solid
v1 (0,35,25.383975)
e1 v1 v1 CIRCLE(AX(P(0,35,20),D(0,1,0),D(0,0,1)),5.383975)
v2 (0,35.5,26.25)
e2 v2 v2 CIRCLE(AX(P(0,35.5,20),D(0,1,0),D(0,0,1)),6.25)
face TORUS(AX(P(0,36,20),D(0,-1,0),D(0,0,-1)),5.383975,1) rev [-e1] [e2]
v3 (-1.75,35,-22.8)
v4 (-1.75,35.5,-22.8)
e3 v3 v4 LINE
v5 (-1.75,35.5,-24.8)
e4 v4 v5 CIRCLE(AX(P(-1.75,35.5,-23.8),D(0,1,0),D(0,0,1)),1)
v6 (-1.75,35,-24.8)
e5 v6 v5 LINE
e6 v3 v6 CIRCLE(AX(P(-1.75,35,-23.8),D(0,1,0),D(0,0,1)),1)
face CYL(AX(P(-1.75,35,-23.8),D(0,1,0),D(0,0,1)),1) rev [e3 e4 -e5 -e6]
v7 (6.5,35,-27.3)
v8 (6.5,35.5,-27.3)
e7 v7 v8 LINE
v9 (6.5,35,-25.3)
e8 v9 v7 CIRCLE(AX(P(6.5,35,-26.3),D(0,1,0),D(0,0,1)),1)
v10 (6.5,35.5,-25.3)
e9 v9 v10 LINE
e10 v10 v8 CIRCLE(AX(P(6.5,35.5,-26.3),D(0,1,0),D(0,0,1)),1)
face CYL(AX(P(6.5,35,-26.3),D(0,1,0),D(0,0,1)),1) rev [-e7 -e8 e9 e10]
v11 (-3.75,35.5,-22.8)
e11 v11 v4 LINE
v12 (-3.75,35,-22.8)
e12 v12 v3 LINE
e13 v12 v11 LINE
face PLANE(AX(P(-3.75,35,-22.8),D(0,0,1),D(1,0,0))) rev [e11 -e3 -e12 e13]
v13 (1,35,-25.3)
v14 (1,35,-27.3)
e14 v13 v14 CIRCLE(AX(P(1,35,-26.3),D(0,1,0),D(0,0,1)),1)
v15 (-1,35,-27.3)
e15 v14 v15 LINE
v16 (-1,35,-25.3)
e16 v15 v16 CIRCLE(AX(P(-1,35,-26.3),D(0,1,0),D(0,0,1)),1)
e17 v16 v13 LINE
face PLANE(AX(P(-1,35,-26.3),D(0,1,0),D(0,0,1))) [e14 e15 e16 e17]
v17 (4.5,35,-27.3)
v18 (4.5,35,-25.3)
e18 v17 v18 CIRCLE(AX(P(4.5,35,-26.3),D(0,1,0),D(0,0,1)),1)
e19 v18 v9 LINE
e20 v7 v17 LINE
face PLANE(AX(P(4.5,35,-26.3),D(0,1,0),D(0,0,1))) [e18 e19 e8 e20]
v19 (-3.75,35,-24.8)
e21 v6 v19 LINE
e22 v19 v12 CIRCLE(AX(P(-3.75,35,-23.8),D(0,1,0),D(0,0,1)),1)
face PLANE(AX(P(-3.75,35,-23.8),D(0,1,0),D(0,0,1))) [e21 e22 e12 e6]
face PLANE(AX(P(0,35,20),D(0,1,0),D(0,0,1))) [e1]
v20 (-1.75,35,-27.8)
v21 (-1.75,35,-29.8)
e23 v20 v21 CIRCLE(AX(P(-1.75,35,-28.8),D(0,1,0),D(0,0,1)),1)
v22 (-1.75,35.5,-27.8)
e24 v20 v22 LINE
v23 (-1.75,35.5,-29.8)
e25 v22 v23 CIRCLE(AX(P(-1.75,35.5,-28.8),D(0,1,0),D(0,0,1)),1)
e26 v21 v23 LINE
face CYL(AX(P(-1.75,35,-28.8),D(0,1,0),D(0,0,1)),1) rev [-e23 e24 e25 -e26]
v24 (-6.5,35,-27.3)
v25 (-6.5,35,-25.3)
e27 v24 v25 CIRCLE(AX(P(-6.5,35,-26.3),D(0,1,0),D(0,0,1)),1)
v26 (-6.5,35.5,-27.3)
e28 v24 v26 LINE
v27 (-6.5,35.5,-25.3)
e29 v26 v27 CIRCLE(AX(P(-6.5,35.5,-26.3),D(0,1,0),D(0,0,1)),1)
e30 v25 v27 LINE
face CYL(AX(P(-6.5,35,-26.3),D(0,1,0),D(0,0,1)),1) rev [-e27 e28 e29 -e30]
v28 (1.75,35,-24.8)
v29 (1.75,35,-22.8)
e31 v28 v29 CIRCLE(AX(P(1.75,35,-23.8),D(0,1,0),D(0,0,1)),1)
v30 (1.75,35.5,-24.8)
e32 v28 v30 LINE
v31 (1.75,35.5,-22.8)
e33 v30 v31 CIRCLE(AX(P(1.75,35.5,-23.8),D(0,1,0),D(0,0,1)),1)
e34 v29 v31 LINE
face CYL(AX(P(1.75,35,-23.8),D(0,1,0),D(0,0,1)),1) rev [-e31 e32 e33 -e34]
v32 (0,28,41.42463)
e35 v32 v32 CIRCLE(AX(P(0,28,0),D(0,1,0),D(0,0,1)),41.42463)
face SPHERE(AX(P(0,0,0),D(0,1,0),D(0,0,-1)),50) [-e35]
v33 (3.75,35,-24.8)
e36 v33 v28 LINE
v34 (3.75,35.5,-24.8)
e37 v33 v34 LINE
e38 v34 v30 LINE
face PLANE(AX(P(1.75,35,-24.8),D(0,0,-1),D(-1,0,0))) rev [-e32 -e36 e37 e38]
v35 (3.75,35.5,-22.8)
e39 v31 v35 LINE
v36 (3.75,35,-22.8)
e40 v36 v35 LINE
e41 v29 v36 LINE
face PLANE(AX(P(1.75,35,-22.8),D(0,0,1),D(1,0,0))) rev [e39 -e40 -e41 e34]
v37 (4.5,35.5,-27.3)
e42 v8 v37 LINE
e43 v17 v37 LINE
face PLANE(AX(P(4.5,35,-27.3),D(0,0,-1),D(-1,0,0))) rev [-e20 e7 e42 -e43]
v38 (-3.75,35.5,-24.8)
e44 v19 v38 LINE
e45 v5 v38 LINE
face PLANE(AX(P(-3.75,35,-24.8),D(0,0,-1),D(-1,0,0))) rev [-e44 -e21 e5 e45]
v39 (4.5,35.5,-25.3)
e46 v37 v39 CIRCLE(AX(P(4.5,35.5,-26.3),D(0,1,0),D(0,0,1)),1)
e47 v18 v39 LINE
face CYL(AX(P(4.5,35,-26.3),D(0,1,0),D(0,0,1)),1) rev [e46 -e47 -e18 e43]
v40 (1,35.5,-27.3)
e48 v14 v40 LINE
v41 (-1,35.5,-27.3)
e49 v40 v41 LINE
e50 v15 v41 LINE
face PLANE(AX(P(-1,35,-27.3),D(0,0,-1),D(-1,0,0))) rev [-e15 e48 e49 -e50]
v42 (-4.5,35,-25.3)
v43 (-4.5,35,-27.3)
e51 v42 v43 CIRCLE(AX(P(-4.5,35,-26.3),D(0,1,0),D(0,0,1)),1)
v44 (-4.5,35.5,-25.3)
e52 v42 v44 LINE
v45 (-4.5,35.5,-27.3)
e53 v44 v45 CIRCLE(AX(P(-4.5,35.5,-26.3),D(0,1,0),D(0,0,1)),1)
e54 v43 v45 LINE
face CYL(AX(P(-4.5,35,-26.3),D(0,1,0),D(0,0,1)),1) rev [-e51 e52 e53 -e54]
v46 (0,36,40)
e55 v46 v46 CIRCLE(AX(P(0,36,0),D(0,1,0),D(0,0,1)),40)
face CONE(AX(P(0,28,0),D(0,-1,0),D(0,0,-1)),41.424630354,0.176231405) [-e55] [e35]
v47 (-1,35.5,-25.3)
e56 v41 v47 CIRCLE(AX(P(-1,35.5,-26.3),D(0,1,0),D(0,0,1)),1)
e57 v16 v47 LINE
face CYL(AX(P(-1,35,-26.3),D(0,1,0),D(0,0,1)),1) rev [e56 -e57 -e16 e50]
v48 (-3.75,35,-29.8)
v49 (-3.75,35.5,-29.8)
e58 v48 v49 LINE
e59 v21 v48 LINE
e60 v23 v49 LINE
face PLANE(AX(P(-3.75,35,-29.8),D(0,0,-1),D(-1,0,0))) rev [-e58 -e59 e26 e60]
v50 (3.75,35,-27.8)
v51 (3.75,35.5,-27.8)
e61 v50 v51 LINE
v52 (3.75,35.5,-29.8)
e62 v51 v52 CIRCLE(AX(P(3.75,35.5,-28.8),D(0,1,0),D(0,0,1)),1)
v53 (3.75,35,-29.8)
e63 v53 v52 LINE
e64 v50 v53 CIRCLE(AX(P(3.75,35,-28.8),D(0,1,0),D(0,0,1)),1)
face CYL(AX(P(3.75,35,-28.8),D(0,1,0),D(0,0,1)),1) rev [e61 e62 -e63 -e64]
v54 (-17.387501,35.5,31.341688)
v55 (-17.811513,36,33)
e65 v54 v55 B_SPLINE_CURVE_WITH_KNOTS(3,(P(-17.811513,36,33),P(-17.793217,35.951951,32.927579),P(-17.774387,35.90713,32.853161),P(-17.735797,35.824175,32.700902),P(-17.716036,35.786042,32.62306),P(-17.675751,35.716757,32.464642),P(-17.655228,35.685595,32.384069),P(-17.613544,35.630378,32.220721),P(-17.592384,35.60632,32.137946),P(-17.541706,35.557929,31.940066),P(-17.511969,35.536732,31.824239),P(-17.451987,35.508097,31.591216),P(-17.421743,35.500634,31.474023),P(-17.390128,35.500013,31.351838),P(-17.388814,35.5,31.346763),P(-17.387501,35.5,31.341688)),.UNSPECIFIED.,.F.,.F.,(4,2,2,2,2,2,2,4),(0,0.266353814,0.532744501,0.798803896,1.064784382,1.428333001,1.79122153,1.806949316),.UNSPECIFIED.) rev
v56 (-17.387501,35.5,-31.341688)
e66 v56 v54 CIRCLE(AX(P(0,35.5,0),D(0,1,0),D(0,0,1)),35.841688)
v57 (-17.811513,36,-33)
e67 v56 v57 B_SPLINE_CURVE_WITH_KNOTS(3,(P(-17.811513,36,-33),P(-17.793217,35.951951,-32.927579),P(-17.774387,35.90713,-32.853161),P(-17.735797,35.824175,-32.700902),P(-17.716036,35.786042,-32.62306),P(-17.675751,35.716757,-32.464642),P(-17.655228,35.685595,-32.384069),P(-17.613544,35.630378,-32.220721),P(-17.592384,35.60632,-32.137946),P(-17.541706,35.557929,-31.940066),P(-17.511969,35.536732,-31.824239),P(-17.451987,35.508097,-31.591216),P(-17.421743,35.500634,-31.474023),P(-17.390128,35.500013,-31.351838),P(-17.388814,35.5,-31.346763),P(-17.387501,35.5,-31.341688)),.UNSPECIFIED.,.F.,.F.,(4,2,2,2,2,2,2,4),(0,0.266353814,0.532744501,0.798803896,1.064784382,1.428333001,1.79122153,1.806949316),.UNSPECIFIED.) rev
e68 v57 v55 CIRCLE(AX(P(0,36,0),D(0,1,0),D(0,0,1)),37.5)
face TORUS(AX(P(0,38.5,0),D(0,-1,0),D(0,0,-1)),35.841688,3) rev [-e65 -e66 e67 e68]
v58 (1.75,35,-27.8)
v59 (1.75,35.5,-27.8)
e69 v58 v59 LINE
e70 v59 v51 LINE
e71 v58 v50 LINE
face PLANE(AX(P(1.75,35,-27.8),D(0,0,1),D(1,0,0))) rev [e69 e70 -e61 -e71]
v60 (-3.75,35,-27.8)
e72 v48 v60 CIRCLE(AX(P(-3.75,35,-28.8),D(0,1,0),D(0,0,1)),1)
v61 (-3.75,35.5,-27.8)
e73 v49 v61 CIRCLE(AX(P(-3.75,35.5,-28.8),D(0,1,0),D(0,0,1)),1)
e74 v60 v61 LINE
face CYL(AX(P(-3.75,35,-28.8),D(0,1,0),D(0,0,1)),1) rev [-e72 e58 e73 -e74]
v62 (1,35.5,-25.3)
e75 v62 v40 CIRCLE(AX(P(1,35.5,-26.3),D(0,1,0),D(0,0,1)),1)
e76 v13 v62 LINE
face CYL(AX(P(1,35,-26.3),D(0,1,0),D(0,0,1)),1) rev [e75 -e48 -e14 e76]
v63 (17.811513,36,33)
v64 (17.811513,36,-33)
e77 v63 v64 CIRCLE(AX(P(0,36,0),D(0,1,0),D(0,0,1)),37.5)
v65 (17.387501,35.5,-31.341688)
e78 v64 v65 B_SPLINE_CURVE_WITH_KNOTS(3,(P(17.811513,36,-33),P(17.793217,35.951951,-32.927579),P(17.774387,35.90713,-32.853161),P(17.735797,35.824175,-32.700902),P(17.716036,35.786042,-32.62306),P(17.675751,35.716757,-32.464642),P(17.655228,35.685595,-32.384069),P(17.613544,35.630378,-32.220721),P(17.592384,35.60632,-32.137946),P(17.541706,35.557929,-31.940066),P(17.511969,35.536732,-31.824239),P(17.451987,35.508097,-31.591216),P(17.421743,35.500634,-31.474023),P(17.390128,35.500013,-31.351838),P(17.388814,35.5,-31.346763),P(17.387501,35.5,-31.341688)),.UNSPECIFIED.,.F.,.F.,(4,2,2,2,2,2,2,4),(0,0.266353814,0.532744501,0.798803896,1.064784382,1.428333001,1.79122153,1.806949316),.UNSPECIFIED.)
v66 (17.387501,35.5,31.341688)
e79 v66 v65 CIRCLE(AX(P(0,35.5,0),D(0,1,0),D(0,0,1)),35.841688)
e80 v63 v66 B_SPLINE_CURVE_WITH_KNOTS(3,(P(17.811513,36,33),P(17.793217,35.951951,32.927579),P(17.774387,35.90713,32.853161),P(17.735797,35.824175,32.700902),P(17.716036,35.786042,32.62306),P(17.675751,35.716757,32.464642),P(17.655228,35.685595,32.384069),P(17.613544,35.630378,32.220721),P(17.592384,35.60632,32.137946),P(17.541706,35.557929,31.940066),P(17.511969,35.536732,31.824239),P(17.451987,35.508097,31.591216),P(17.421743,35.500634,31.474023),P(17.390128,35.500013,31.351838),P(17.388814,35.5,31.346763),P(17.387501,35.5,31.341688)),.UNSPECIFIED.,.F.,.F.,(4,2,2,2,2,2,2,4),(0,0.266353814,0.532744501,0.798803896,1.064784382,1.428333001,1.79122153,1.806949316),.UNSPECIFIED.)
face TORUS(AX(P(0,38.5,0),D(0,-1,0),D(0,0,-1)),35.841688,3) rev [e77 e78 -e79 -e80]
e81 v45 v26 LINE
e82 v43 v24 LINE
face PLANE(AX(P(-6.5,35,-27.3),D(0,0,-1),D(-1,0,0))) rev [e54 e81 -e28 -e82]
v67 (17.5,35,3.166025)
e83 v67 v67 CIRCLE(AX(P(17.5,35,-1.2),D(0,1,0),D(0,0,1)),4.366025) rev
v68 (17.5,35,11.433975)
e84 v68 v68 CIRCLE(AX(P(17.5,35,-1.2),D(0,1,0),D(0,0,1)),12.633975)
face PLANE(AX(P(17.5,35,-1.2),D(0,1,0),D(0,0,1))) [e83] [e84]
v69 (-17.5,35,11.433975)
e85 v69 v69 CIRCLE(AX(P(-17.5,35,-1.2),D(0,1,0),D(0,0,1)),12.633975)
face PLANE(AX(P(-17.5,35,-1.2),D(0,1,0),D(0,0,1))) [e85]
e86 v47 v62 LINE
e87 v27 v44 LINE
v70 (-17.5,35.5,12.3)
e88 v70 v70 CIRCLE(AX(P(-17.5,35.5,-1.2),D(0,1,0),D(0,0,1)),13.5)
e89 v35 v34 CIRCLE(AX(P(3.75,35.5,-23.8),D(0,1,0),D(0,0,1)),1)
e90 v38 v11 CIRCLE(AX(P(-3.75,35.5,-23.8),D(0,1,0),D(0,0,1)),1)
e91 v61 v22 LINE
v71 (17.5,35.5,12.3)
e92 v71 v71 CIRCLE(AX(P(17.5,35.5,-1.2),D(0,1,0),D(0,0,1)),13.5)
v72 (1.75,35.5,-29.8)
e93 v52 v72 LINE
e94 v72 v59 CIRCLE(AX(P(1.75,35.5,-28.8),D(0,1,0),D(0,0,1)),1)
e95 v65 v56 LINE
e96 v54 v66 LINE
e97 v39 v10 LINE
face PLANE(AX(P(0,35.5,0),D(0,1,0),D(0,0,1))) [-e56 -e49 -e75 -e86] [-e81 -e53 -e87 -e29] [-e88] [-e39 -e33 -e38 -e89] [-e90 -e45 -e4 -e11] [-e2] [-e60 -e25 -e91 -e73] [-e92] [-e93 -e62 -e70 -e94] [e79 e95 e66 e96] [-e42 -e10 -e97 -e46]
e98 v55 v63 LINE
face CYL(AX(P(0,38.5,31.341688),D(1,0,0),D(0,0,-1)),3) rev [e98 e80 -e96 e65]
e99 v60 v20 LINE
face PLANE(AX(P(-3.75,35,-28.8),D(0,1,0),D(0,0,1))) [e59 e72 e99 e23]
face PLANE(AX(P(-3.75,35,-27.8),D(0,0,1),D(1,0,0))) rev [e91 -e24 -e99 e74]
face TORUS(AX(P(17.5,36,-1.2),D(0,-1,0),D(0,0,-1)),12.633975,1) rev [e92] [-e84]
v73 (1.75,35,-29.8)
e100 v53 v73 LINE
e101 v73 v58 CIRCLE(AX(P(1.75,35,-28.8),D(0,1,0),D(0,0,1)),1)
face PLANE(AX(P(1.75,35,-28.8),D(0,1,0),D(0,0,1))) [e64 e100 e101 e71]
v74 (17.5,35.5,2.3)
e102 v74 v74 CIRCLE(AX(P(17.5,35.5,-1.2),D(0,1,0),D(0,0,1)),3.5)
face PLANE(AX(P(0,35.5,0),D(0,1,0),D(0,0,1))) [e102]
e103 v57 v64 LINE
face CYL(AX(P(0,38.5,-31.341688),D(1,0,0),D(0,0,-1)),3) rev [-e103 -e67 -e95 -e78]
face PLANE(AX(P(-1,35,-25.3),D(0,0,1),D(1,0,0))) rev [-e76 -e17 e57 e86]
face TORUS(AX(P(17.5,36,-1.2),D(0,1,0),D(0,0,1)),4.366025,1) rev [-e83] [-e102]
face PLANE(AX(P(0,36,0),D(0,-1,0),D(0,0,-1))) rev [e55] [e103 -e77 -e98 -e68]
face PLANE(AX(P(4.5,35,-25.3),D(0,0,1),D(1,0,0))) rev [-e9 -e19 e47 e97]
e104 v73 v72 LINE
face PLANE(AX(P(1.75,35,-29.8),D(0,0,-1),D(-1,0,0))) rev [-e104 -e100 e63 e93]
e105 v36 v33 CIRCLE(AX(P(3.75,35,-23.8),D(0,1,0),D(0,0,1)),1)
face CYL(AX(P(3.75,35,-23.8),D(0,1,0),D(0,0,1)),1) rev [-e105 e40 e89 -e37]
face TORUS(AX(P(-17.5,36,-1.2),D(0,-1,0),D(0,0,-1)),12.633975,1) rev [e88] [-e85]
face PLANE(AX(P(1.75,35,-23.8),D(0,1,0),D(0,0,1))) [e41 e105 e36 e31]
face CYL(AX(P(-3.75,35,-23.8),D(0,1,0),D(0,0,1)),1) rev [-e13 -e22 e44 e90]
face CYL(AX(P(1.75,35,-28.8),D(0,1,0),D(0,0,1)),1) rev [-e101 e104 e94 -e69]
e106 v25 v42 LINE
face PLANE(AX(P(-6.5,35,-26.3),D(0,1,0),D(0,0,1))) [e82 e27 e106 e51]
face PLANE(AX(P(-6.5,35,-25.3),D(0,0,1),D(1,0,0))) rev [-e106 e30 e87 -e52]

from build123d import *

# Parameters (mm, degrees)
EXTRUDE1_DEPTH = 0.5
FILLET1_R      = 3
SKETCH3_R      = 13.5
SKETCH3_R_2    = 3.5
SKETCH3_R_3    = 6.25
EXTRUDE2_DEPTH = 0.5
FILLET2_R      = 1


with BuildPart() as part:
    # Sketch1 → Revolve1 (revolve)
    with BuildSketch(Plane(origin=(0, 0, 0), x_dir=(0, 0, -1), z_dir=(1, 0, 0))):
        with BuildLine():
            Line((40, 36), (41.424630354, 28))
            ThreePointArc((41.424630354, 28), (44.158804332, -23.452078799), (0, -50))
            Line((0, -50), (0, 36))
            Line((0, 36), (40, 36))
        make_face()
    revolve(axis=Axis((0, 36, 0), (0, -1, 0)))

    # Sketch2 → Extrude1 (cut)
    with BuildSketch(Plane(origin=(0, 36, 0), x_dir=(1, 0, 0), z_dir=(0, 1, 0))):
        with BuildLine():
            Line((17.811513131, 33), (-17.811513131, 33))
            ThreePointArc((-17.811513131, 33), (-37.5, 0), (-17.811513131, -33))
            Line((-17.811513131, -33), (17.811513131, -33))
            ThreePointArc((17.811513131, -33), (32.20389528, -19.213514223), (37.5, 0))
            ThreePointArc((37.5, 0), (32.20389528, 19.213514223), (17.811513131, 33))
        make_face()
    extrude(amount=-EXTRUDE1_DEPTH, mode=Mode.SUBTRACT)

    # Fillet1
    # the kernel refuses this fillet: 3 mm, written as the material it adds along each edge
    with BuildSketch(Plane(origin=(-21.957294119, 35.5, 33), x_dir=(0, 1.0, -3.3253400033406348e-12), z_dir=(1, 0, 0)), Plane(origin=(21.957294119, 35.5, -33), x_dir=(0, 1.0, 3.3253400033406348e-12), z_dir=(-1, 0, 0))) as fillet1_piece_1:
        with BuildLine():
            CenterArc((3, -1.658312395), FILLET1_R, 146.442690238, 33.557309762)
            Line((0, -1.658312395), (0, 0))
            Line((0, 0), (0.5, 0))
        make_face()
    extrude(amount=43.914588237)
    with BuildSketch(Plane(origin=(0, 35.5, 0), x_dir=(0.37490714563861727, 0, 0.9270623669144945), z_dir=(-0.9270623669144945, 0, 0.37490714563861727))) as fillet1_piece_2:
        with BuildLine():
            CenterArc((35.841687605, 3), FILLET1_R, 270, 33.557309762)
            Line((35.841687605, 0), (37.5, 0))
            Line((37.5, 0), (37.5, 0.5))
        make_face()
    revolve(axis=Axis((0, 35.5, 0), (0, 1, 0)), revolution_arc=135.962852024)
    with BuildSketch(Plane(origin=(0, 35.5, 0), x_dir=(-0.37490714563861693, 0, -0.9270623669144946), z_dir=(0.9270623669144946, 0, -0.37490714563861693))) as fillet1_piece_3:
        with BuildLine():
            CenterArc((35.841687605, 3), FILLET1_R, 270, 33.557309762)
            Line((35.841687605, 0), (37.5, 0))
            Line((37.5, 0), (37.5, 0.5))
        make_face()
    revolve(axis=Axis((0, 35.5, 0), (0, 1, 0)), revolution_arc=135.962852024)

    # Sketch3 → Extrude2 (cut)
    # profile 1 of 10: a face of its own
    with BuildSketch(Plane(origin=(0, 35.5, 0), x_dir=(1, 0, 0), z_dir=(0, 1, 0))):
        with Locations(Location((-17.5, 1.2, 0), (0, 0, 270))):
            Circle(SKETCH3_R)
    # profile 2 of 10: a face of its own
    with BuildSketch(Plane(origin=(0, 35.5, 0), x_dir=(1, 0, 0), z_dir=(0, 1, 0))):
        with Locations(Location((17.5, 1.2, 0), (0, 0, 270))):
            Circle(SKETCH3_R)
        with Locations(Location((17.5, 1.2, 0), (0, 0, 270))):
            Circle(SKETCH3_R_2, mode=Mode.SUBTRACT)
    # profile 3 of 10: a face of its own
    with BuildSketch(Plane(origin=(0, 35.5, 0), x_dir=(1, 0, 0), z_dir=(0, 1, 0))):
        with Locations(Location((0, -20, 0), (0, 0, 270))):
            Circle(SKETCH3_R_3)
    # profile 4 of 10: a face of its own
    with BuildSketch(Plane(origin=(0, 35.5, 0), x_dir=(1, 0, 0), z_dir=(0, 1, 0))):
        with BuildLine():
            Line((-3.75, 24.8), (-1.75, 24.8))
            ThreePointArc((-1.75, 24.8), (-0.75, 23.8), (-1.75, 22.8))
            Line((-1.75, 22.8), (-3.75, 22.8))
            ThreePointArc((-3.75, 22.8), (-4.75, 23.8), (-3.75, 24.8))
        make_face()
    # profile 5 of 10: a face of its own
    with BuildSketch(Plane(origin=(0, 35.5, 0), x_dir=(1, 0, 0), z_dir=(0, 1, 0))):
        with BuildLine():
            Line((-6.5, 27.3), (-4.5, 27.3))
            ThreePointArc((-4.5, 27.3), (-3.5, 26.3), (-4.5, 25.3))
            Line((-4.5, 25.3), (-6.5, 25.3))
            ThreePointArc((-6.5, 25.3), (-7.5, 26.3), (-6.5, 27.3))
        make_face()
    # profile 6 of 10: a face of its own
    with BuildSketch(Plane(origin=(0, 35.5, 0), x_dir=(1, 0, 0), z_dir=(0, 1, 0))):
        with BuildLine():
            Line((-1, 27.3), (1, 27.3))
            ThreePointArc((1, 27.3), (2, 26.3), (1, 25.3))
            Line((1, 25.3), (-1, 25.3))
            ThreePointArc((-1, 25.3), (-2, 26.3), (-1, 27.3))
        make_face()
    # profile 7 of 10: a face of its own
    with BuildSketch(Plane(origin=(0, 35.5, 0), x_dir=(1, 0, 0), z_dir=(0, 1, 0))):
        with BuildLine():
            Line((-3.75, 29.8), (-1.75, 29.8))
            ThreePointArc((-1.75, 29.8), (-0.75, 28.8), (-1.75, 27.8))
            Line((-1.75, 27.8), (-3.75, 27.8))
            ThreePointArc((-3.75, 27.8), (-4.75, 28.8), (-3.75, 29.8))
        make_face()
    # profile 8 of 10: a face of its own
    with BuildSketch(Plane(origin=(0, 35.5, 0), x_dir=(1, 0, 0), z_dir=(0, 1, 0))):
        with BuildLine():
            Line((1.75, 29.8), (3.75, 29.8))
            ThreePointArc((3.75, 29.8), (4.75, 28.8), (3.75, 27.8))
            Line((3.75, 27.8), (1.75, 27.8))
            ThreePointArc((1.75, 27.8), (0.75, 28.8), (1.75, 29.8))
        make_face()
    # profile 9 of 10: a face of its own
    with BuildSketch(Plane(origin=(0, 35.5, 0), x_dir=(1, 0, 0), z_dir=(0, 1, 0))):
        with BuildLine():
            Line((4.5, 27.3), (6.5, 27.3))
            ThreePointArc((6.5, 27.3), (7.5, 26.3), (6.5, 25.3))
            Line((6.5, 25.3), (4.5, 25.3))
            ThreePointArc((4.5, 25.3), (3.5, 26.3), (4.5, 27.3))
        make_face()
    # profile 10 of 10: a face of its own
    with BuildSketch(Plane(origin=(0, 35.5, 0), x_dir=(1, 0, 0), z_dir=(0, 1, 0))):
        with BuildLine():
            Line((1.75, 24.8), (3.75, 24.8))
            ThreePointArc((3.75, 24.8), (4.75, 23.8), (3.75, 22.8))
            Line((3.75, 22.8), (1.75, 22.8))
            ThreePointArc((1.75, 22.8), (0.75, 23.8), (1.75, 24.8))
        make_face()
    extrude(amount=-EXTRUDE2_DEPTH, mode=Mode.SUBTRACT)

    # Fillet2
    # the kernel refuses this fillet: 1 mm, written as the material it adds along each edge
    with BuildSketch(Plane(origin=(0, 35, 20), x_dir=(0, 0, 1), z_dir=(-1, 0, 0))) as fillet2_piece_1:
        with BuildLine():
            CenterArc((5.383974596, 1), FILLET2_R, 270, 60)
            Line((5.383974596, 0), (5.383974596, -0.02))
            Line((5.383974596, -0.02), (6.25, -0.02))
            Line((6.25, -0.02), (6.27, 0))
            ThreePointArc((6.27, 0), (6.27, 0.25), (6.267320508, 0.49))
            Line((6.267320508, 0.49), (6.25, 0.5))
        make_face()
    revolve(axis=Axis((0, 35, 20), (0, 1, 0)))
    with BuildSketch(Plane(origin=(17.5, 35, -1.2), x_dir=(0, 0, 1), z_dir=(-1, 0, 0))) as fillet2_piece_2:
        with BuildLine():
            CenterArc((12.633974596, 1), FILLET2_R, 270, 60)
            Line((12.633974596, 0), (12.633974596, -0.02))
            Line((12.633974596, -0.02), (13.5, -0.02))
            Line((13.5, -0.02), (13.52, 0))
            ThreePointArc((13.52, 0), (13.52, 0.25), (13.517320508, 0.49))
            Line((13.517320508, 0.49), (13.5, 0.5))
        make_face()
    revolve(axis=Axis((17.5, 35, -1.2), (0, 1, 0)))
    with BuildSketch(Plane(origin=(17.5, 35, -1.2), x_dir=(0, 0, 1), z_dir=(-1, 0, 0))) as fillet2_piece_3:
        with BuildLine():
            CenterArc((4.366025404, 1), FILLET2_R, 210, 60)
            Line((3.5, 0.5), (3.482679492, 0.49))
            ThreePointArc((3.482679492, 0.49), (3.48, 0.25), (3.48, 0))
            Line((3.48, 0), (3.5, -0.02))
            Line((3.5, -0.02), (4.366025404, -0.02))
            Line((4.366025404, -0.02), (4.366025404, 0))
        make_face()
    revolve(axis=Axis((17.5, 35, -1.2), (0, 1, 0)))
    with BuildSketch(Plane(origin=(-17.5, 35, -1.2), x_dir=(0, 0, 1), z_dir=(-1, 0, 0))) as fillet2_piece_4:
        with BuildLine():
            CenterArc((12.633974596, 1), FILLET2_R, 270, 60)
            Line((12.633974596, 0), (12.633974596, -0.02))
            Line((12.633974596, -0.02), (13.5, -0.02))
            Line((13.5, -0.02), (13.52, 0))
            ThreePointArc((13.52, 0), (13.52, 0.25), (13.517320508, 0.49))
            Line((13.517320508, 0.49), (13.5, 0.5))
        make_face()
    revolve(axis=Axis((-17.5, 35, -1.2), (0, 1, 0)))


solid = part.part
